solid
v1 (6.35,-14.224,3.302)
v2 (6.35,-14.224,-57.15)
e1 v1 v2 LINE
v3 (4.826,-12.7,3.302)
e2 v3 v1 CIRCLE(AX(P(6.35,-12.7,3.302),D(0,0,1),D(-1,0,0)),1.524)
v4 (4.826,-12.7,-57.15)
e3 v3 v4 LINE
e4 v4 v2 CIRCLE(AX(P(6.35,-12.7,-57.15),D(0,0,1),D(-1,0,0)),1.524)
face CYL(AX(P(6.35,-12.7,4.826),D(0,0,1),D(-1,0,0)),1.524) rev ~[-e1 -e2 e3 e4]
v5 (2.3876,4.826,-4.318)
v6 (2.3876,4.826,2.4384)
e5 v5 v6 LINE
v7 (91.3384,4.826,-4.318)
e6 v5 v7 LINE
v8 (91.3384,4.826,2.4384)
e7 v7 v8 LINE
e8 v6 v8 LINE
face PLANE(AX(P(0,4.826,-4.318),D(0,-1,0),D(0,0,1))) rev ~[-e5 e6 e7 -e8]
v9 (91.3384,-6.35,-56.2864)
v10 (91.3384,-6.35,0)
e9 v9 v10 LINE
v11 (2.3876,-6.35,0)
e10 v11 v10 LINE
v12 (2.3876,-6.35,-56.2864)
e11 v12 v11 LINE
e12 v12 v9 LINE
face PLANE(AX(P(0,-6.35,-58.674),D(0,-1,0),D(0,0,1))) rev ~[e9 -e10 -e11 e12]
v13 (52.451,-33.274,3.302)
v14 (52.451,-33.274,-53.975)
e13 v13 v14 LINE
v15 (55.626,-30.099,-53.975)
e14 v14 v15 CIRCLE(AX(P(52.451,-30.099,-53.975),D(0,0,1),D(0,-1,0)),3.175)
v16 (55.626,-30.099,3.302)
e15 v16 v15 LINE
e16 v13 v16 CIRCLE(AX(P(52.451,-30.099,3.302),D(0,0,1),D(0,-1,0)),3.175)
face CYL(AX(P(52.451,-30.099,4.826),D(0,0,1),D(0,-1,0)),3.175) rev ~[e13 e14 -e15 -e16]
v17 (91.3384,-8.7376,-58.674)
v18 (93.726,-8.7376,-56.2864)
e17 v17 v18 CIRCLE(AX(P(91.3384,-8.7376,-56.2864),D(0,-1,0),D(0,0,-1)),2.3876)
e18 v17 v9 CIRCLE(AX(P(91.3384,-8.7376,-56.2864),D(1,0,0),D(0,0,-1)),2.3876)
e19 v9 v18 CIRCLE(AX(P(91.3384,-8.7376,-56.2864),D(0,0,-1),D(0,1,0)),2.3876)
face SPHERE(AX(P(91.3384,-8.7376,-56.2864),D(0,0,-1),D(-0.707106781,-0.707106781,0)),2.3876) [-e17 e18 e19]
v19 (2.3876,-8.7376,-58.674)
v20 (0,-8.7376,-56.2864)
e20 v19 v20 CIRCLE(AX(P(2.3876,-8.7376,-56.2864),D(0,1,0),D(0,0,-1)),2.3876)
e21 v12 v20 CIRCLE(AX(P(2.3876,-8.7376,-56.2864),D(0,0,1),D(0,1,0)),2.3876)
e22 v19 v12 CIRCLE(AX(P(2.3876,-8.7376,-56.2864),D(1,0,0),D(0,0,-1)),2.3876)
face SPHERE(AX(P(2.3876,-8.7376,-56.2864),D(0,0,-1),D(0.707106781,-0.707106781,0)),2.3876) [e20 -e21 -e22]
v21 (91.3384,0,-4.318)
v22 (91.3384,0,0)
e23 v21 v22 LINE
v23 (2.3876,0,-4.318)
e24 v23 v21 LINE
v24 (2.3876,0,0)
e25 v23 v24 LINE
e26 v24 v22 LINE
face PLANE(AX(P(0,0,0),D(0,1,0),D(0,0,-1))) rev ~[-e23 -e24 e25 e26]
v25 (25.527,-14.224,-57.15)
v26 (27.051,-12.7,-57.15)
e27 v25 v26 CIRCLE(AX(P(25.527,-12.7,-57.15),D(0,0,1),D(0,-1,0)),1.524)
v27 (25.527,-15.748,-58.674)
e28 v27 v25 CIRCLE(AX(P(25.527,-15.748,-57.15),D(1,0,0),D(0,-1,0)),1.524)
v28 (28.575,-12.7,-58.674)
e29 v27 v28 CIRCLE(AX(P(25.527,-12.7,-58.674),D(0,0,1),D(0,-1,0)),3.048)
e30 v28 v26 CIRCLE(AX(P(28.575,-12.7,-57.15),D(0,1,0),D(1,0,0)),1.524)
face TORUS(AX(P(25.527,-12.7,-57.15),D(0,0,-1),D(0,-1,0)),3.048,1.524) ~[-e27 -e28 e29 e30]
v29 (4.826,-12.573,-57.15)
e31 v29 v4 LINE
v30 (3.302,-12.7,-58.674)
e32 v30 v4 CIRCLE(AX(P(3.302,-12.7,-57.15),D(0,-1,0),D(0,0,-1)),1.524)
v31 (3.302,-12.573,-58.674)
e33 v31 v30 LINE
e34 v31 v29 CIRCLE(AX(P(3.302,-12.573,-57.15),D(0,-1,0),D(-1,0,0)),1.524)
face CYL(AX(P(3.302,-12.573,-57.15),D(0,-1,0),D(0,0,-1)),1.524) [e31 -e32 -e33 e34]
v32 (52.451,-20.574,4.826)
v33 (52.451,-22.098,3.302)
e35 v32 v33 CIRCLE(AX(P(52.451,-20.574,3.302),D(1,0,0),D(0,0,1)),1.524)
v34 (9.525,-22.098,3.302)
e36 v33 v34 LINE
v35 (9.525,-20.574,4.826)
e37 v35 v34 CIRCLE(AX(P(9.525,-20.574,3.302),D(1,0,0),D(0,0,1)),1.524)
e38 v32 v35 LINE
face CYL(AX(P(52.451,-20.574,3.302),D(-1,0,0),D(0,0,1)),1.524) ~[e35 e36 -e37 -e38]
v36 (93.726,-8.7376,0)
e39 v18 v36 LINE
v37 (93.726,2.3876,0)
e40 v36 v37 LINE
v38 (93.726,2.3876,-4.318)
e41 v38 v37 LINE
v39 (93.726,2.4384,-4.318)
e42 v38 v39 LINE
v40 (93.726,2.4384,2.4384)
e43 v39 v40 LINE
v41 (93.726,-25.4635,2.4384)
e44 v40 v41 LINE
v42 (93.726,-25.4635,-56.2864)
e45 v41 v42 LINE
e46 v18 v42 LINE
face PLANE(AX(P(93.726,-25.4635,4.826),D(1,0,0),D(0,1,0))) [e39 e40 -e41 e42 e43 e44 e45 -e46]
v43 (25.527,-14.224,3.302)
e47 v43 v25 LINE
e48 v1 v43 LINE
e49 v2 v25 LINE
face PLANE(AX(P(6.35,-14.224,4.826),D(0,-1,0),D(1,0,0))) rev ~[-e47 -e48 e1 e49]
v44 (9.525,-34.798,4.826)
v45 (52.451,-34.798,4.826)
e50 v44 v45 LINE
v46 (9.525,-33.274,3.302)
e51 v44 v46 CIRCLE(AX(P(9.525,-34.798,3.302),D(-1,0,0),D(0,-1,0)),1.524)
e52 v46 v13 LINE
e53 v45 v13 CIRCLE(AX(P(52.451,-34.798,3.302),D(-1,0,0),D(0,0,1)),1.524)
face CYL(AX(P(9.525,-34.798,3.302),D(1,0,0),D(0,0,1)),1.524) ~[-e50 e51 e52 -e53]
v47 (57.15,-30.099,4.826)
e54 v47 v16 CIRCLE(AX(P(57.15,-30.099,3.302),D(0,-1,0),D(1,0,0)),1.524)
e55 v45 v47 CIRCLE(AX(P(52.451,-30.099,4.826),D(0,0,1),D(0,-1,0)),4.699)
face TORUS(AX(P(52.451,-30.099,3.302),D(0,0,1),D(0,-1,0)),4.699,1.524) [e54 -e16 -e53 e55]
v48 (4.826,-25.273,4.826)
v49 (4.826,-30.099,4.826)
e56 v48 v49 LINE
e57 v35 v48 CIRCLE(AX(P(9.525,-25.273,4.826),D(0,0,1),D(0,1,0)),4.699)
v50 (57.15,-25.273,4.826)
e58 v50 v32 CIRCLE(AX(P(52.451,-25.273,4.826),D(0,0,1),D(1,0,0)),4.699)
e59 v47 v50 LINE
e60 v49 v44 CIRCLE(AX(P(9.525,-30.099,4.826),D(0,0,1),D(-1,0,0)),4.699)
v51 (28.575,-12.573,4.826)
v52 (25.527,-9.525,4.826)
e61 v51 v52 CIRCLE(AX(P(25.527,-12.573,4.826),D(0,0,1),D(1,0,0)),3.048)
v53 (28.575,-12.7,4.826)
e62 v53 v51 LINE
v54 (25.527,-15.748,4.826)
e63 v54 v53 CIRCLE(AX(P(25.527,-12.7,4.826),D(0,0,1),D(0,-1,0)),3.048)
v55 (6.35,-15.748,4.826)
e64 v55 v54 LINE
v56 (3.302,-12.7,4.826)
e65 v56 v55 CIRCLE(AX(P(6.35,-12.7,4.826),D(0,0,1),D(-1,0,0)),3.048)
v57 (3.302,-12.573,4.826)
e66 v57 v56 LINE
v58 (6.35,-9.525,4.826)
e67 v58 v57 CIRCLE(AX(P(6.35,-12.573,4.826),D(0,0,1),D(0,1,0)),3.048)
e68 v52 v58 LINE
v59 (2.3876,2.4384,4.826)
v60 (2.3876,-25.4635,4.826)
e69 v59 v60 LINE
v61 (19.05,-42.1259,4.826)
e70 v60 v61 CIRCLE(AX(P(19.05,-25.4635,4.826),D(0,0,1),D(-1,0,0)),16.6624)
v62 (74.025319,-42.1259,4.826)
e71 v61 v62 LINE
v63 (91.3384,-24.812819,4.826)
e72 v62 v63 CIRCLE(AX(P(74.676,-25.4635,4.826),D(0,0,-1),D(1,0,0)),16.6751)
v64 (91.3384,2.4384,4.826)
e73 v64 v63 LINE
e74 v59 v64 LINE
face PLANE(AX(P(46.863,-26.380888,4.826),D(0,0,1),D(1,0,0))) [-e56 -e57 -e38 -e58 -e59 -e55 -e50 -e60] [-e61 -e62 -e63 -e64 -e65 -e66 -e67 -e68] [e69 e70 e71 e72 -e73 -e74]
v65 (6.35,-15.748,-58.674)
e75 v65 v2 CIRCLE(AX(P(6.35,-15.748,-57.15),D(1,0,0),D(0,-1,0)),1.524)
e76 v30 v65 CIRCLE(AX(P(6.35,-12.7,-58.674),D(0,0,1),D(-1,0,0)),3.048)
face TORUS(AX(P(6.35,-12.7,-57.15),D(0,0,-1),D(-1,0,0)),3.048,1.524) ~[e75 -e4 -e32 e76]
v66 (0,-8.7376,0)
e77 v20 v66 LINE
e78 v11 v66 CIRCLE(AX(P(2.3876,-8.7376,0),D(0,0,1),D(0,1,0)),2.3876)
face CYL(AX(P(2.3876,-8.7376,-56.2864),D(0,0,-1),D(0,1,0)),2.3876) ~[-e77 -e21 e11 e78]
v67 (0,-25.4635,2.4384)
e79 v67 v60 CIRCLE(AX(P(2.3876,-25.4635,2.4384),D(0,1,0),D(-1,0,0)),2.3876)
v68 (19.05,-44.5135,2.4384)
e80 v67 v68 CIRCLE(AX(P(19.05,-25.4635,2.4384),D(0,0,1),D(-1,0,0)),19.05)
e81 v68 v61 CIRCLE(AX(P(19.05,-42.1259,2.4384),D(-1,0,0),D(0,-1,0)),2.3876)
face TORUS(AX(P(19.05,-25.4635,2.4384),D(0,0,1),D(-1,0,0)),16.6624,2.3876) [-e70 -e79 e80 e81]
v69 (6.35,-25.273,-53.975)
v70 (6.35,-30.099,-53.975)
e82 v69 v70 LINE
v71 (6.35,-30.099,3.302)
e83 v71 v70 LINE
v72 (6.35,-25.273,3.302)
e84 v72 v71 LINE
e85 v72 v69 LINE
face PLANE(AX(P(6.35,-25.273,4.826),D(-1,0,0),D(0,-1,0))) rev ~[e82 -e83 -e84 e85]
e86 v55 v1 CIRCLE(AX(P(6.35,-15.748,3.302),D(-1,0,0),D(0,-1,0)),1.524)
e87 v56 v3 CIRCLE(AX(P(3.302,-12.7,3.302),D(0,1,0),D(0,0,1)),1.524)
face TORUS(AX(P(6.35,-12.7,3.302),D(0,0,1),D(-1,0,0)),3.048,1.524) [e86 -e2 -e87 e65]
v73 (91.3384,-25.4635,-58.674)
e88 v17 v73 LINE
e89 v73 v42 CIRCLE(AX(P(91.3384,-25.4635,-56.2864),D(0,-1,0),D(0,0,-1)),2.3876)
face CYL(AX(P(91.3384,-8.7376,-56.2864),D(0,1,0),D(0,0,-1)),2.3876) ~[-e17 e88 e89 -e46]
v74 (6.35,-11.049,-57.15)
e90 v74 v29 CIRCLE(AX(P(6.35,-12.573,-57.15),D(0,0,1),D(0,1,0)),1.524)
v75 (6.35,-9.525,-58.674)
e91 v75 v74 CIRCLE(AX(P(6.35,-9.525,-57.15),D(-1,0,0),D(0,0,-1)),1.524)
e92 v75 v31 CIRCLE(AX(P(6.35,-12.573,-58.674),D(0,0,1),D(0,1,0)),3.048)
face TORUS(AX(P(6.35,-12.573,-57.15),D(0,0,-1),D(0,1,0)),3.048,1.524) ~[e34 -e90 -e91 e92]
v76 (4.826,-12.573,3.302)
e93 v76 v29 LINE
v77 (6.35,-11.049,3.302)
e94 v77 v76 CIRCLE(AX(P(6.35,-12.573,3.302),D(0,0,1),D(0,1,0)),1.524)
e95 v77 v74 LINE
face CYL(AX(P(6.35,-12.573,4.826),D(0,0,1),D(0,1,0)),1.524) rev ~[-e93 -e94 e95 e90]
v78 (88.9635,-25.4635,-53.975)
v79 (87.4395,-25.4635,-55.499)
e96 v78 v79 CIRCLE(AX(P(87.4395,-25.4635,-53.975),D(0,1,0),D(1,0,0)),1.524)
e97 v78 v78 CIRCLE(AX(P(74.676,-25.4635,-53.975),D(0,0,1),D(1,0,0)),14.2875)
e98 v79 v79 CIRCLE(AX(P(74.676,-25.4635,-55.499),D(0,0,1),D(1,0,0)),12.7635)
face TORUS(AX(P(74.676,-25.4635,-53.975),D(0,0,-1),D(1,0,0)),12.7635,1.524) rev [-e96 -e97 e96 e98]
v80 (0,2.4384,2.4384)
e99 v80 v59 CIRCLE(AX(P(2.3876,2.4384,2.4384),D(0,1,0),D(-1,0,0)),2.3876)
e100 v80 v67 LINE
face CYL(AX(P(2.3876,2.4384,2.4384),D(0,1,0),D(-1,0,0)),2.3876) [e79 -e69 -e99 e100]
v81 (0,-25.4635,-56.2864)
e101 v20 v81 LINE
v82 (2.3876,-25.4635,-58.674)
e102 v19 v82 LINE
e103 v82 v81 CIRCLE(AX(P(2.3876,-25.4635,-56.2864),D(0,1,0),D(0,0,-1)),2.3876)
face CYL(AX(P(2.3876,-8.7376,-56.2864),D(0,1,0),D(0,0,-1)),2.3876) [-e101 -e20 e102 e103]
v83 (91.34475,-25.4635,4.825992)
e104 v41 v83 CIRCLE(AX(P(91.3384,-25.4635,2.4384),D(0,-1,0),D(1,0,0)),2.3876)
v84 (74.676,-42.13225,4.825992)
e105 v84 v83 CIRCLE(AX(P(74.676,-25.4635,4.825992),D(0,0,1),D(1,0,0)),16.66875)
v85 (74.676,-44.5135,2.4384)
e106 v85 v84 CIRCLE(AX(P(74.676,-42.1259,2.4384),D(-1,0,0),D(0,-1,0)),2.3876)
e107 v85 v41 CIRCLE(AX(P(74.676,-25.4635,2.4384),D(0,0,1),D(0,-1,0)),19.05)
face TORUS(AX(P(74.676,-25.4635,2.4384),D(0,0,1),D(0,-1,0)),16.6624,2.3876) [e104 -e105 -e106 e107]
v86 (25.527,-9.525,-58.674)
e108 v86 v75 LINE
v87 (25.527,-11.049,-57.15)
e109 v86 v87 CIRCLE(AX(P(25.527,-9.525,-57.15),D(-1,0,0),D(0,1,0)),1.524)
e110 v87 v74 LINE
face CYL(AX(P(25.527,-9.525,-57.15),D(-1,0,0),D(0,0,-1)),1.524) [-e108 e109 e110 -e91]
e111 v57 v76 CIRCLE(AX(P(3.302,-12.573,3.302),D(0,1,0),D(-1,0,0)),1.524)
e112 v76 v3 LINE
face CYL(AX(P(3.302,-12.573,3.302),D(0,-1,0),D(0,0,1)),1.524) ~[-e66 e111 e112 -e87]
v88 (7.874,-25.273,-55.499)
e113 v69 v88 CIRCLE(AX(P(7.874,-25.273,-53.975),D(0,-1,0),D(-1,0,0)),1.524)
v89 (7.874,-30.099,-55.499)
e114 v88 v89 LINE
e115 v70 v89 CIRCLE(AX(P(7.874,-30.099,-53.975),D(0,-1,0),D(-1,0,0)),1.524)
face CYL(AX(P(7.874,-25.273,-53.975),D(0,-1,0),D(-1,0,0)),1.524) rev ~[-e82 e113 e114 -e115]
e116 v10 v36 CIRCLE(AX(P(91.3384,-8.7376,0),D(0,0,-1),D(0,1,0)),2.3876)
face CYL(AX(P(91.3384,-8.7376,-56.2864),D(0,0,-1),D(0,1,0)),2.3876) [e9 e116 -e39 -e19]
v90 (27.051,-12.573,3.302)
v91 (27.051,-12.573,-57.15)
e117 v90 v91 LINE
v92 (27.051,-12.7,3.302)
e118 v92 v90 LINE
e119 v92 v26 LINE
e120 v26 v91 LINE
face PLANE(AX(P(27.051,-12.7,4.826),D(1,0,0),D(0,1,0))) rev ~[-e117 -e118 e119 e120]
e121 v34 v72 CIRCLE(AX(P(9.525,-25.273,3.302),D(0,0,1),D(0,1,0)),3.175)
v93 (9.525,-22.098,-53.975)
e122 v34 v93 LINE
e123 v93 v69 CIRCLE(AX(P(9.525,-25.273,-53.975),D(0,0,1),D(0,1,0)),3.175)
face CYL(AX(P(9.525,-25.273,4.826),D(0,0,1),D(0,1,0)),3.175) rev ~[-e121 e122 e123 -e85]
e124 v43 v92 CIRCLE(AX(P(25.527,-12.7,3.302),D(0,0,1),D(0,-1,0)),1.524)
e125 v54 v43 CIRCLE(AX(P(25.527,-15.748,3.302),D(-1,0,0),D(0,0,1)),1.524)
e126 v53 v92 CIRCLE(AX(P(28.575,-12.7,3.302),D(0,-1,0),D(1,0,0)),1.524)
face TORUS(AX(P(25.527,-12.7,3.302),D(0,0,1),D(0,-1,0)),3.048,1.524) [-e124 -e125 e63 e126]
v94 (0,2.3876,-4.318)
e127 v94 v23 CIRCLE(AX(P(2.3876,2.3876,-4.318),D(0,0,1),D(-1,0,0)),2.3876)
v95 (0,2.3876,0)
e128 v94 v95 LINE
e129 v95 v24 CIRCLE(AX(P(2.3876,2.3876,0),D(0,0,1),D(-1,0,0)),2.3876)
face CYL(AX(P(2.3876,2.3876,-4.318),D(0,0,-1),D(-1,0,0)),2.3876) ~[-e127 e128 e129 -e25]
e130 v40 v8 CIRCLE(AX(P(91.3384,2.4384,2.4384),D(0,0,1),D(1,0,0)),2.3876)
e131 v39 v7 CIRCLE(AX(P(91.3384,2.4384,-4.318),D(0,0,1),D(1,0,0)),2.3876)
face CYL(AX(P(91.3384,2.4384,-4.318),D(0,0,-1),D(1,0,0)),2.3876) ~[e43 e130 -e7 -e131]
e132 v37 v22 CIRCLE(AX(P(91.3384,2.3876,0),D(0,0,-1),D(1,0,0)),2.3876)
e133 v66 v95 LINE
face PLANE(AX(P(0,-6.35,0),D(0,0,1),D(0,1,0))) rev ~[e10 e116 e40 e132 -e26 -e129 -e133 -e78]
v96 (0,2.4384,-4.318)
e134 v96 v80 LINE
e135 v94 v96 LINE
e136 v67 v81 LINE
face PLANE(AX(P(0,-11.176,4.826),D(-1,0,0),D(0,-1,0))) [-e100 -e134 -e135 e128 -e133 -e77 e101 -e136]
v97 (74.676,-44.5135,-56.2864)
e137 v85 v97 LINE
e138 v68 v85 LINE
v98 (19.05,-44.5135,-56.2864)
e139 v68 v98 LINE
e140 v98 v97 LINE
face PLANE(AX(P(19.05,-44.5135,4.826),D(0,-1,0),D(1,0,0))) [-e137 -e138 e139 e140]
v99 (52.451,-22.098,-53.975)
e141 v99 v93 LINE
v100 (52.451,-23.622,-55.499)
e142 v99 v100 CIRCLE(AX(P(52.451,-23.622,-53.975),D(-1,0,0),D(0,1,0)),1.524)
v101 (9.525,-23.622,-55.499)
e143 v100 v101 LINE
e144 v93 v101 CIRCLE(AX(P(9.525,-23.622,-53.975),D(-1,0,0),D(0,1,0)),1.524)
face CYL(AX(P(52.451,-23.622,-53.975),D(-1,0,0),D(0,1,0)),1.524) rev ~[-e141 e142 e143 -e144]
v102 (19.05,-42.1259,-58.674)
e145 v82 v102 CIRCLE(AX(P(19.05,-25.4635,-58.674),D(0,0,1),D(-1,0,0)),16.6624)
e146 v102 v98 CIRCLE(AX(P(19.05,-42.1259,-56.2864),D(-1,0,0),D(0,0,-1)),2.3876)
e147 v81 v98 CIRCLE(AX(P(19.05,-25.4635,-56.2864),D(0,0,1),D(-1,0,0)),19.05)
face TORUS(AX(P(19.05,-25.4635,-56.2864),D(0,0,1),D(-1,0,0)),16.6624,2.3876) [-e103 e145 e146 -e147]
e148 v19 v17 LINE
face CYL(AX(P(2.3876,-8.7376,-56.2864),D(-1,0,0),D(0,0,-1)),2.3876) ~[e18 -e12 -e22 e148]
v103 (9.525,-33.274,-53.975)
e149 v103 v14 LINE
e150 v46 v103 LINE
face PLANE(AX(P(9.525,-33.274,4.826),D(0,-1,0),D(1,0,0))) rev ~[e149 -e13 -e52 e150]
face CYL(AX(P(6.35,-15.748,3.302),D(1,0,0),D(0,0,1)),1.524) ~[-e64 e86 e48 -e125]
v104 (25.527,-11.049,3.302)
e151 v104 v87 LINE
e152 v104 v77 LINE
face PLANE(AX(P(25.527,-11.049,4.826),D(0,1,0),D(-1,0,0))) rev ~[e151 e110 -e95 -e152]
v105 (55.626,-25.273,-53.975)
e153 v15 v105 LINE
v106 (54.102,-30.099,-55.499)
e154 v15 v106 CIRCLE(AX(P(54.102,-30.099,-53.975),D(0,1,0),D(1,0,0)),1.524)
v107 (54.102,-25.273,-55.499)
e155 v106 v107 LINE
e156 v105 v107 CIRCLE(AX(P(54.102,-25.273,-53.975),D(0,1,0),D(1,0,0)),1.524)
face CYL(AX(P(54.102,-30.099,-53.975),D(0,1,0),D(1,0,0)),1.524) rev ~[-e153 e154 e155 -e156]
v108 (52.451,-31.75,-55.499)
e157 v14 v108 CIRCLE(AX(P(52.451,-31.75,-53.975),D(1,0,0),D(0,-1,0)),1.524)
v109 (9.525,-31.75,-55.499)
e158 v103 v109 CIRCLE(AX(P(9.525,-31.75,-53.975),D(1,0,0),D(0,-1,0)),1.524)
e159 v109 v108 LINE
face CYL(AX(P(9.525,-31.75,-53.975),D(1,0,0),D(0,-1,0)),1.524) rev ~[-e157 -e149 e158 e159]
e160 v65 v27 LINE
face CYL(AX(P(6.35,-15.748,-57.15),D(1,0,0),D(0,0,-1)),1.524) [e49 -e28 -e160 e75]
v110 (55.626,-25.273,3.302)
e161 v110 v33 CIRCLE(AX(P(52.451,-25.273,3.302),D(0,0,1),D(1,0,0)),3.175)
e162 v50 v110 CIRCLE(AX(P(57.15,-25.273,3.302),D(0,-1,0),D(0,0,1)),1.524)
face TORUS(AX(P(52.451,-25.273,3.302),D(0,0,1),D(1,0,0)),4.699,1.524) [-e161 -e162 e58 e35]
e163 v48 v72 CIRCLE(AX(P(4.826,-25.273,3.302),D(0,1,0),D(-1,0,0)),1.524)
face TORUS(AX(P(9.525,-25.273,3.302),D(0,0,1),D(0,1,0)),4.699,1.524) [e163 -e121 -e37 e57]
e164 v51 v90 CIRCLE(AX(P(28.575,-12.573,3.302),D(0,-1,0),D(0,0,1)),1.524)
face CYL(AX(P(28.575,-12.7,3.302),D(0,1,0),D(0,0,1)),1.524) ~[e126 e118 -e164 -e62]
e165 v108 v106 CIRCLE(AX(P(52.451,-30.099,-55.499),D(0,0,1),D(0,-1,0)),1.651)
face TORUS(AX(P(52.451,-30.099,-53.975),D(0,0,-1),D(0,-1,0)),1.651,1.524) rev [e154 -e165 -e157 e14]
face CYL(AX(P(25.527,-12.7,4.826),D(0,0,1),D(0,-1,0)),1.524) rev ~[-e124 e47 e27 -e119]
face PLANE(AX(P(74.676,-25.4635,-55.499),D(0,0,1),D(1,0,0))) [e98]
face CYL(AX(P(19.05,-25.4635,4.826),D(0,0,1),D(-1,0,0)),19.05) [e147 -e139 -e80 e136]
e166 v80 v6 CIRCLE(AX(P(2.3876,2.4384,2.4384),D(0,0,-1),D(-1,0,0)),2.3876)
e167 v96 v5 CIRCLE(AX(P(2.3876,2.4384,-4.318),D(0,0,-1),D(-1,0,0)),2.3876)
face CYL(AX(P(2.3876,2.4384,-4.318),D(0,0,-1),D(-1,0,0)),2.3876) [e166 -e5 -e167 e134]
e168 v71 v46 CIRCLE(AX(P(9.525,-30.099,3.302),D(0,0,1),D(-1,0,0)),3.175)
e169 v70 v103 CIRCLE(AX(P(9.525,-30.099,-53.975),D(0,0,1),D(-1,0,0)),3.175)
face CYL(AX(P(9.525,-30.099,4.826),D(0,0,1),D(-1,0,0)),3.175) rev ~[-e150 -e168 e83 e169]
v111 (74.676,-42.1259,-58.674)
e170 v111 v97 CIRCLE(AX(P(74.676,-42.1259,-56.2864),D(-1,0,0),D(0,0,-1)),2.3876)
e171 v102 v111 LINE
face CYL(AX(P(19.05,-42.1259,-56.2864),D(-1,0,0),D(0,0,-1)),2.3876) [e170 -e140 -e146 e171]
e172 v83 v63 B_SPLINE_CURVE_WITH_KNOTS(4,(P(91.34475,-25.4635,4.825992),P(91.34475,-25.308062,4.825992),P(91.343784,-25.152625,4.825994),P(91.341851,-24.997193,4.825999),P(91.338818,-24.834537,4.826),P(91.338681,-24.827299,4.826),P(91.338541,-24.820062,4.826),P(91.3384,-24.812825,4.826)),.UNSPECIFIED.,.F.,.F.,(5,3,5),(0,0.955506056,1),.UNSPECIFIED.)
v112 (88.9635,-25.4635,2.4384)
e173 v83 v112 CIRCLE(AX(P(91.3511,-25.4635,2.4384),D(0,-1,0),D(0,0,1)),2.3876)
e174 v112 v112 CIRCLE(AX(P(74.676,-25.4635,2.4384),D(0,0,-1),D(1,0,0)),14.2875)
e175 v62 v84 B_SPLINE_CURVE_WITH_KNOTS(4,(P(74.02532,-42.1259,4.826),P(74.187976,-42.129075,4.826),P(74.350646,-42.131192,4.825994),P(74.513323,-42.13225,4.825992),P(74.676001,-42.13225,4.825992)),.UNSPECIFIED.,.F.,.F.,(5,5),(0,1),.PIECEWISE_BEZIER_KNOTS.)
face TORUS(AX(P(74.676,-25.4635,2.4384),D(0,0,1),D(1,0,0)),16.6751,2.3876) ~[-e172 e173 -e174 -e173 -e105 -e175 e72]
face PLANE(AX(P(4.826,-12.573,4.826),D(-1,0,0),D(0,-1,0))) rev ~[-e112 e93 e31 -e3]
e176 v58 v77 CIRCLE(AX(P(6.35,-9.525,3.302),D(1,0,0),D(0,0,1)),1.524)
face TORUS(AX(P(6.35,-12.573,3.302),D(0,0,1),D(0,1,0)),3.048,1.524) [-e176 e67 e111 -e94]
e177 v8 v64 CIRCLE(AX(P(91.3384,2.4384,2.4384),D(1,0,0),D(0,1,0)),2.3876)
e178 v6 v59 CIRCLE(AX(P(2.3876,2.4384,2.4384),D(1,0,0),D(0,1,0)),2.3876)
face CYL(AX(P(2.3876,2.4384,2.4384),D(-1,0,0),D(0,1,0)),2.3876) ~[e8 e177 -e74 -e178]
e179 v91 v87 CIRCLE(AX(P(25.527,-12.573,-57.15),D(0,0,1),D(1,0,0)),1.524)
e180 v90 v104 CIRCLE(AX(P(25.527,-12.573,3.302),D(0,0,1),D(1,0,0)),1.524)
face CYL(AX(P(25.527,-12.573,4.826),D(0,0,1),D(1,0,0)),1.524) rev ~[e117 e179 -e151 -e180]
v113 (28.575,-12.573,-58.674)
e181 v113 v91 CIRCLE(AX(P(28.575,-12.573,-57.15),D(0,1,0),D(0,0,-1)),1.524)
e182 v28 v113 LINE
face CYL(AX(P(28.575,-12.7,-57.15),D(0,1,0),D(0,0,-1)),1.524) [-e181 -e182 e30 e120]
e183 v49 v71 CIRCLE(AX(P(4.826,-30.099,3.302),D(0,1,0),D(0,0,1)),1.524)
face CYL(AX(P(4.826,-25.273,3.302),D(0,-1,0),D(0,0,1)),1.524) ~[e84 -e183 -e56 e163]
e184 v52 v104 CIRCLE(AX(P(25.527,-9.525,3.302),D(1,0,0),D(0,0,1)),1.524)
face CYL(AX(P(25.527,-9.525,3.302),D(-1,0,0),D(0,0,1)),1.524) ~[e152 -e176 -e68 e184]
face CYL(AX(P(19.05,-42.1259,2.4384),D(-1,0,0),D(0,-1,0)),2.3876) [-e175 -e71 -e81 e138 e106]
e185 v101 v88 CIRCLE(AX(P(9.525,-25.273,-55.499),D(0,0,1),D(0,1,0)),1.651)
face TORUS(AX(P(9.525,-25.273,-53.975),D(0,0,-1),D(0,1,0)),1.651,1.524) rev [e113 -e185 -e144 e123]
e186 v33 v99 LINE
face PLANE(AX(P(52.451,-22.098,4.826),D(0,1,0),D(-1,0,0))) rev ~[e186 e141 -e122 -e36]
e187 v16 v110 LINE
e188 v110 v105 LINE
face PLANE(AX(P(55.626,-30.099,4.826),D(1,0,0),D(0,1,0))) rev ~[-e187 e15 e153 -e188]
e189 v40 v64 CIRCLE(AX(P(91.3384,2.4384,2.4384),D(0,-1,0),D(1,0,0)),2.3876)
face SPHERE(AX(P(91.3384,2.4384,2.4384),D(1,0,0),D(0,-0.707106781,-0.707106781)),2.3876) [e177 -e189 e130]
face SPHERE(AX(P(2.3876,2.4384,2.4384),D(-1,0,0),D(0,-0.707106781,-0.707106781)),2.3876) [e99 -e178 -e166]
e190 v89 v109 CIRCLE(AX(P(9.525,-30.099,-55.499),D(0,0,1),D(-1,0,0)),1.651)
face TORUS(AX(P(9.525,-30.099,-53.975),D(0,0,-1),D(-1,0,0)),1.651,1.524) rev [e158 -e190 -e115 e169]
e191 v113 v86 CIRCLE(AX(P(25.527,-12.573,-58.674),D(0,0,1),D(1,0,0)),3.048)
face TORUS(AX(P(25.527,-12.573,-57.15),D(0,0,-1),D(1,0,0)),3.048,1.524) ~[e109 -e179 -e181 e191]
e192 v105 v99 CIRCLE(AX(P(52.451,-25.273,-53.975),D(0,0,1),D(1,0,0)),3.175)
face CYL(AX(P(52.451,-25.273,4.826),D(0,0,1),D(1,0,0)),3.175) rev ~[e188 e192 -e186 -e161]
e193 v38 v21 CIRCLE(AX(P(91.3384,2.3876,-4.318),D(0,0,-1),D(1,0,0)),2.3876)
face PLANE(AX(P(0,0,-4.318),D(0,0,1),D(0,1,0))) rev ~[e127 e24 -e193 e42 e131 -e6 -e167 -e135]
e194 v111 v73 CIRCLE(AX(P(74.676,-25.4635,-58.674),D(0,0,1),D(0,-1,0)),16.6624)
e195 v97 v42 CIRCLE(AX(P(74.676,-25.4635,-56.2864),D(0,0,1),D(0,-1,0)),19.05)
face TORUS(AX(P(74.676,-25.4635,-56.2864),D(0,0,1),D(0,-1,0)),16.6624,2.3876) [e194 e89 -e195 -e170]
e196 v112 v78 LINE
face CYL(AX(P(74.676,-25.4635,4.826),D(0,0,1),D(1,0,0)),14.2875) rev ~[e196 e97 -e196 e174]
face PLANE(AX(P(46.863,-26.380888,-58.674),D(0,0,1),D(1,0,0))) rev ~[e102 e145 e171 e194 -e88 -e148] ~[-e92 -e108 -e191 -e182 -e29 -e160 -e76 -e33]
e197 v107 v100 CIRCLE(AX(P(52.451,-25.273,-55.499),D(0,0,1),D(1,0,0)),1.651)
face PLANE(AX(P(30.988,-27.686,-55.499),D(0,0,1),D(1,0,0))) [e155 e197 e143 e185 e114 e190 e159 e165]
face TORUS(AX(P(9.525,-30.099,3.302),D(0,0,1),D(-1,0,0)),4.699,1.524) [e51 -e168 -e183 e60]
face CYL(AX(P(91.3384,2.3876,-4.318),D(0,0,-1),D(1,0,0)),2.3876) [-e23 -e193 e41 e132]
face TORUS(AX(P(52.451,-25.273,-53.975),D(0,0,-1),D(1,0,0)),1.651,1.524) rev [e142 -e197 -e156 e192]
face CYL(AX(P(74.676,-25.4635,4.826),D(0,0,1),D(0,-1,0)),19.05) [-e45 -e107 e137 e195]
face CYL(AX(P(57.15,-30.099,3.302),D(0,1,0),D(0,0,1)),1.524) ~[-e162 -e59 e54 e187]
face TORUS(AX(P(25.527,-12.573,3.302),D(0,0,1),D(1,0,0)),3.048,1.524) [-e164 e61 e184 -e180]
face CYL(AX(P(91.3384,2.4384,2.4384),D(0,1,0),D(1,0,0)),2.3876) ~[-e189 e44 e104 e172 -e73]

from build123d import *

# Parameters (mm, degrees)
F1_DEPTH     = 93.726
F3_DEPTH     = 63.5
F4_DEPTH     = 60.325
F6_DEPTH     = 63.501
F8_DEPTH     = 60.325
F9_T1_DEPTH  = 88.9508
F9_T3_DEPTH  = 27.9019
F9_T5_DEPTH  = 6.7564
F9_T7_DEPTH  = 56.2864
F9_T9_DEPTH  = 16.7259
F9_T11_DEPTH = 4.318
F9_T13_DEPTH = 55.626
F9_S17_W     = 2.435352
F9_S17_H     = 2.435352
F9_T18_DEPTH = 2.435352
F9_S23_W     = 2.435352
F9_S23_H     = 2.435352
F9_T24_DEPTH = 2.435352
F9_S29_W     = 2.435352
F9_S29_H     = 2.435352
F9_T30_DEPTH = 2.435352
F9_S35_W     = 2.435352
F9_S35_H     = 2.435352
F9_T36_DEPTH = 2.435352
F9_T42_ANGLE = 90
F9_T44_ANGLE = 90
F9_T46_ANGLE = 90
F9_T48_ANGLE = 90
F10_R        = 1.524


# Not quite as in the source:
# - a fillet or chamfer that OpenCascade refuses, or shapes differently, is made with other operations: its cross-section is extruded or revolved along the edge and cut away or added


with BuildPart() as f1:
    # F0 (on Right) → F1 (new body)
    with BuildSketch(Plane.YZ):
        Polygon((-6.35, 0), (0, 0), (0, -4.318), (4.826, -4.318), (4.826, 4.826), (-11.176, 4.826), (-11.176, -58.674), (-6.35, -58.674), align=None)
    extrude(amount=F1_DEPTH)

    # F2 (on face) → F3 (join, through all)
    with BuildSketch(Plane.XY.offset(4.826)):
        with BuildLine():
            Line((93.726, -11.176), (74.676, -11.176))
            Line((74.676, -11.176), (0, -11.176))
            Line((0, -11.176), (0, -25.4635))
            ThreePointArc((0, -25.4635), (5.5796158184, -38.9338841816), (19.05, -44.5135))
            Line((19.05, -44.5135), (74.676, -44.5135))
            ThreePointArc((74.676, -44.5135), (88.1463841816, -38.9338841816), (93.726, -25.4635))
            Line((93.726, -25.4635), (93.726, -11.176))
        make_face()
        with BuildLine():
            ThreePointArc((74.676, -11.176), (84.7787881362, -15.3607118638), (88.9635, -25.4635))
            ThreePointArc((88.9635, -25.4635), (64.5732118638, -35.5662881362), (74.676, -11.176))
        make_face(mode=Mode.SUBTRACT)
        with BuildLine():
            ThreePointArc((74.676, -11.176), (64.5732118638, -35.5662881362), (88.9635, -25.4635))
            ThreePointArc((88.9635, -25.4635), (84.7787881362, -15.3607118638), (74.676, -11.176))
        make_face()
    extrude(amount=-F3_DEPTH)

    # F2 (on face) → F4 (cut)
    with BuildSketch(Plane.XY.offset(4.826)):
        with BuildLine():
            ThreePointArc((74.676, -11.176), (64.5732118638, -35.5662881362), (88.9635, -25.4635))
            ThreePointArc((88.9635, -25.4635), (84.7787881362, -15.3607118638), (74.676, -11.176))
        make_face()
    extrude(amount=-F4_DEPTH, mode=Mode.SUBTRACT)

    # F5 (on face) → F6 (cut, through all)
    with BuildSketch(Plane.XY.offset(4.826)):
        with BuildLine():
            Line((25.527, -11.049), (6.35, -11.049))
            ThreePointArc((6.35, -11.049), (5.2723692655, -11.4953692655), (4.826, -12.573))
            Line((4.826, -12.573), (4.826, -12.7))
            ThreePointArc((4.826, -12.7), (5.2723692655, -13.7776307345), (6.35, -14.224))
            Line((6.35, -14.224), (25.527, -14.224))
            ThreePointArc((25.527, -14.224), (26.6046307345, -13.7776307345), (27.051, -12.7))
            Line((27.051, -12.7), (27.051, -12.573))
            ThreePointArc((27.051, -12.573), (26.6046307345, -11.4953692655), (25.527, -11.049))
        make_face()
    extrude(amount=-F6_DEPTH, mode=Mode.SUBTRACT)

    # F7 (on face) → F8 (cut, through all)
    with BuildSketch(Plane.XY.offset(4.826)):
        with BuildLine():
            ThreePointArc((55.626, -25.273), (54.6960640303, -23.0279359697), (52.451, -22.098))
            Line((52.451, -22.098), (9.525, -22.098))
            ThreePointArc((9.525, -22.098), (7.2799359697, -23.0279359697), (6.35, -25.273))
            Line((6.35, -25.273), (6.35, -30.099))
            ThreePointArc((6.35, -30.099), (7.2799359697, -32.3440640303), (9.525, -33.274))
            Line((9.525, -33.274), (52.451, -33.274))
            ThreePointArc((52.451, -33.274), (54.6960640303, -32.3440640303), (55.626, -30.099))
            Line((55.626, -30.099), (55.626, -25.273))
        make_face()
    extrude(amount=-F8_DEPTH, mode=Mode.SUBTRACT)

    # F9: fillet of radius 2.3876 on 11 edges, made by hand

    # F9_s2 → F9_t1 (cut)
    with BuildSketch(Plane.YZ.offset(2.3876)):
        with BuildLine():
            ThreePointArc((4.826, 2.4384), (4.1266881508, 4.1266881508), (2.4384, 4.826))
            Line((2.4384, 4.826), (2.4384, 4.873752))
            Line((2.4384, 4.873752), (4.873752, 4.873752))
            Line((4.873752, 4.873752), (4.873752, 2.4384))
            Line((4.873752, 2.4384), (4.826, 2.4384))
        make_face()
        with BuildLine():
            ThreePointArc((-8.7376, -58.674), (-7.0493118492, -57.9746881508), (-6.35, -56.2864))
            Line((-6.35, -56.2864), (-6.302248, -56.2864))
            Line((-6.302248, -56.2864), (-6.302248, -58.721752))
            Line((-6.302248, -58.721752), (-8.7376, -58.721752))
            Line((-8.7376, -58.721752), (-8.7376, -58.674))
        make_face()
    extrude(amount=F9_T1_DEPTH, mode=Mode.SUBTRACT)

    # F9_s4 → F9_t3 (cut)
    with BuildSketch(Plane.XZ.offset(-2.4384)):
        with BuildLine():
            ThreePointArc((0, 2.4384), (0.6993118492, 4.1266881508), (2.3876, 4.826))
            Line((2.3876, 4.826), (2.3876, 4.873752))
            Line((2.3876, 4.873752), (-0.047752, 4.873752))
            Line((-0.047752, 4.873752), (-0.047752, 2.4384))
            Line((-0.047752, 2.4384), (0, 2.4384))
        make_face()
        with BuildLine():
            ThreePointArc((93.726, 2.4384), (93.0266881508, 4.1266881508), (91.3384, 4.826))
            Line((91.3384, 4.826), (91.3384, 4.873752))
            Line((91.3384, 4.873752), (93.773752, 4.873752))
            Line((93.773752, 4.873752), (93.773752, 2.4384))
            Line((93.773752, 2.4384), (93.726, 2.4384))
        make_face()
    extrude(amount=F9_T3_DEPTH, mode=Mode.SUBTRACT)

    # F9_s6 → F9_t5 (cut)
    with BuildSketch(Plane.XY.offset(-4.318)):
        with BuildLine():
            ThreePointArc((0, 2.4384), (0.6993118492, 4.1266881508), (2.3876, 4.826))
            Line((2.3876, 4.826), (2.3876, 4.873752))
            Line((2.3876, 4.873752), (-0.047752, 4.873752))
            Line((-0.047752, 4.873752), (-0.047752, 2.4384))
            Line((-0.047752, 2.4384), (0, 2.4384))
        make_face()
        with BuildLine():
            ThreePointArc((93.726, 2.4384), (93.0266881508, 4.1266881508), (91.3384, 4.826))
            Line((91.3384, 4.826), (91.3384, 4.873752))
            Line((91.3384, 4.873752), (93.773752, 4.873752))
            Line((93.773752, 4.873752), (93.773752, 2.4384))
            Line((93.773752, 2.4384), (93.726, 2.4384))
        make_face()
    extrude(amount=F9_T5_DEPTH, mode=Mode.SUBTRACT)

    # F9_s8 → F9_t7 (cut)
    with BuildSketch(Plane.XY.offset(-56.2864)):
        with BuildLine():
            ThreePointArc((2.3876, -6.35), (0.6993118492, -7.0493118492), (0, -8.7376))
            Line((0, -8.7376), (-0.047752, -8.7376))
            Line((-0.047752, -8.7376), (-0.047752, -6.302248))
            Line((-0.047752, -6.302248), (2.3876, -6.302248))
            Line((2.3876, -6.302248), (2.3876, -6.35))
        make_face()
        with BuildLine():
            ThreePointArc((91.3384, -6.35), (93.0266881508, -7.0493118492), (93.726, -8.7376))
            Line((93.726, -8.7376), (93.773752, -8.7376))
            Line((93.773752, -8.7376), (93.773752, -6.302248))
            Line((93.773752, -6.302248), (91.3384, -6.302248))
            Line((91.3384, -6.302248), (91.3384, -6.35))
        make_face()
    extrude(amount=F9_T7_DEPTH, mode=Mode.SUBTRACT)

    # F9_s10 → F9_t9 (cut)
    with BuildSketch(Plane.XZ.offset(8.7376)):
        with BuildLine():
            ThreePointArc((2.3876, -58.674), (0.6993118492, -57.9746881508), (0, -56.2864))
            Line((0, -56.2864), (-0.047752, -56.2864))
            Line((-0.047752, -56.2864), (-0.047752, -58.721752))
            Line((-0.047752, -58.721752), (2.3876, -58.721752))
            Line((2.3876, -58.721752), (2.3876, -58.674))
        make_face()
        with BuildLine():
            ThreePointArc((91.3384, -58.674), (93.0266881508, -57.9746881508), (93.726, -56.2864))
            Line((93.726, -56.2864), (93.773752, -56.2864))
            Line((93.773752, -56.2864), (93.773752, -58.721752))
            Line((93.773752, -58.721752), (91.3384, -58.721752))
            Line((91.3384, -58.721752), (91.3384, -58.674))
        make_face()
    extrude(amount=F9_T9_DEPTH, mode=Mode.SUBTRACT)

    # F9_s12 → F9_t11 (cut)
    with BuildSketch(Plane.XY.offset(-4.318)):
        with BuildLine():
            ThreePointArc((0, 2.3876), (0.6993118492, 0.6993118492), (2.3876, 0))
            Line((2.3876, 0), (2.3876, -0.047752))
            Line((2.3876, -0.047752), (-0.047752, -0.047752))
            Line((-0.047752, -0.047752), (-0.047752, 2.3876))
            Line((-0.047752, 2.3876), (0, 2.3876))
        make_face()
        with BuildLine():
            ThreePointArc((93.726, 2.3876), (93.0266881508, 0.6993118492), (91.3384, 0))
            Line((91.3384, 0), (91.3384, -0.047752))
            Line((91.3384, -0.047752), (93.773752, -0.047752))
            Line((93.773752, -0.047752), (93.773752, 2.3876))
            Line((93.773752, 2.3876), (93.726, 2.3876))
        make_face()
    extrude(amount=F9_T11_DEPTH, mode=Mode.SUBTRACT)

    # F9_s14 → F9_t13 (cut)
    with BuildSketch(Plane.YZ.offset(19.05)):
        with BuildLine():
            ThreePointArc((-42.1259, -58.674), (-43.8141881508, -57.9746881508), (-44.5135, -56.2864))
            Line((-44.5135, -56.2864), (-44.561252, -56.2864))
            Line((-44.561252, -56.2864), (-44.561252, -58.721752))
            Line((-44.561252, -58.721752), (-42.1259, -58.721752))
            Line((-42.1259, -58.721752), (-42.1259, -58.674))
        make_face()
        with BuildLine():
            ThreePointArc((-44.5135, 2.4384), (-43.8141881508, 4.1266881508), (-42.1259, 4.826))
            Line((-42.1259, 4.826), (-42.1259, 4.873752))
            Line((-42.1259, 4.873752), (-44.561252, 4.873752))
            Line((-44.561252, 4.873752), (-44.561252, 2.4384))
            Line((-44.561252, 2.4384), (-44.5135, 2.4384))
        make_face()
    extrude(amount=F9_T13_DEPTH, mode=Mode.SUBTRACT)


with BuildPart() as f9_tool16:
    # F9_s17 → F9_t18 (new body)
    with BuildSketch(Plane.YZ.offset(2.3876)):
        with Locations((3.656076, 3.656076)):
            Rectangle(F9_S17_W, F9_S17_H)
    extrude(amount=-F9_T18_DEPTH)

    # F9_s19 → F9_t20 (revolve, cut)
    with BuildSketch(Plane(origin=(2.3876, 2.4384, 2.4384), x_dir=(0, -0.7071067812, -0.7071067812), z_dir=(0, 0.7071067812, -0.7071067812))):
        with BuildLine():
            ThreePointArc((0, -2.3876), (2.3876, 0), (0, 2.3876))
            Line((0, 2.3876), (0, -2.3876))
        make_face()
    revolve(axis=Axis((2.3876, 2.4384, 2.4384), (-1, 0, 0)), mode=Mode.SUBTRACT)


with BuildPart() as f1_1:
    add(f1.part)

    # F9_t15: cut F9_tool16
    add(f9_tool16.part, mode=Mode.SUBTRACT)


with BuildPart() as f9_tool22:
    # F9_s23 → F9_t24 (new body)
    with BuildSketch(Plane.YZ.offset(91.3384)):
        with Locations((3.656076, 3.656076)):
            Rectangle(F9_S23_W, F9_S23_H)
    extrude(amount=F9_T24_DEPTH)

    # F9_s25 → F9_t26 (revolve, cut)
    with BuildSketch(Plane(origin=(91.3384, 2.4384, 2.4384), x_dir=(0, -0.7071067812, -0.7071067812), z_dir=(0, -0.7071067812, 0.7071067812))):
        with BuildLine():
            ThreePointArc((0, -2.3876), (2.3876, 0), (0, 2.3876))
            Line((0, 2.3876), (0, -2.3876))
        make_face()
    revolve(axis=Axis((91.3384, 2.4384, 2.4384), (1, 0, 0)), mode=Mode.SUBTRACT)


with BuildPart() as f1_2:
    add(f1_1.part)

    # F9_t21: cut F9_tool22
    add(f9_tool22.part, mode=Mode.SUBTRACT)


with BuildPart() as f9_tool28:
    # F9_s29 → F9_t30 (new body)
    with BuildSketch(Plane.XY.offset(-56.2864)):
        with Locations((1.169924, -7.519924)):
            Rectangle(F9_S29_W, F9_S29_H)
    extrude(amount=-F9_T30_DEPTH)

    # F9_s31 → F9_t32 (revolve, cut)
    with BuildSketch(Plane(origin=(2.3876, -8.7376, -56.2864), x_dir=(0.7071067812, -0.7071067812, 0), z_dir=(0.7071067812, 0.7071067812, 0))):
        with BuildLine():
            ThreePointArc((0, -2.3876), (2.3876, 0), (0, 2.3876))
            Line((0, 2.3876), (0, -2.3876))
        make_face()
    revolve(axis=Axis((2.3876, -8.7376, -56.2864), (0, 0, -1)), mode=Mode.SUBTRACT)


with BuildPart() as f1_3:
    add(f1_2.part)

    # F9_t27: cut F9_tool28
    add(f9_tool28.part, mode=Mode.SUBTRACT)


with BuildPart() as f9_tool34:
    # F9_s35 → F9_t36 (new body)
    with BuildSketch(Plane.XY.offset(-56.2864)):
        with Locations((92.556076, -7.519924)):
            Rectangle(F9_S35_W, F9_S35_H)
    extrude(amount=-F9_T36_DEPTH)

    # F9_s37 → F9_t38 (revolve, cut)
    with BuildSketch(Plane(origin=(91.3384, -8.7376, -56.2864), x_dir=(-0.7071067812, -0.7071067812, 0), z_dir=(0.7071067812, -0.7071067812, 0))):
        with BuildLine():
            ThreePointArc((0, -2.3876), (2.3876, 0), (0, 2.3876))
            Line((0, 2.3876), (0, -2.3876))
        make_face()
    revolve(axis=Axis((91.3384, -8.7376, -56.2864), (0, 0, -1)), mode=Mode.SUBTRACT)


with BuildPart() as f1_4:
    add(f1_3.part)

    # F9_t33: cut F9_tool34
    add(f9_tool34.part, mode=Mode.SUBTRACT)

    # F9_s39 → F9_t40 (revolve, cut)
    with BuildSketch(Plane.XZ.offset(25.4635)):
        with BuildLine():
            ThreePointArc((91.3511, 4.826), (89.6628118492, 4.1266881508), (88.9635, 2.4384))
            Line((88.9635, 2.4384), (88.915748, 2.4384))
            Line((88.915748, 2.4384), (88.915748, 4.873752))
            Line((88.915748, 4.873752), (91.3511, 4.873752))
            Line((91.3511, 4.873752), (91.3511, 4.826))
        make_face()
    revolve(axis=Axis((74.676, -25.4635, 4.826), (0, 0, -1)), mode=Mode.SUBTRACT)

    # F9_s41 → F9_t42 (revolve, cut)
    with BuildSketch(Plane.XZ.offset(25.4635)):
        with BuildLine():
            ThreePointArc((2.3876, -58.674), (0.6993118492, -57.9746881508), (0, -56.2864))
            Line((0, -56.2864), (-0.047752, -56.2864))
            Line((-0.047752, -56.2864), (-0.047752, -58.721752))
            Line((-0.047752, -58.721752), (2.3876, -58.721752))
            Line((2.3876, -58.721752), (2.3876, -58.674))
        make_face()
    revolve(axis=Axis((19.05, -25.4635, -58.674), (0, 0, 1)), revolution_arc=F9_T42_ANGLE, mode=Mode.SUBTRACT)

    # F9_s43 → F9_t44 (revolve, cut)
    with BuildSketch(Plane.YZ.offset(74.676)):
        with BuildLine():
            ThreePointArc((-42.1259, -58.674), (-43.8141881508, -57.9746881508), (-44.5135, -56.2864))
            Line((-44.5135, -56.2864), (-44.561252, -56.2864))
            Line((-44.561252, -56.2864), (-44.561252, -58.721752))
            Line((-44.561252, -58.721752), (-42.1259, -58.721752))
            Line((-42.1259, -58.721752), (-42.1259, -58.674))
        make_face()
    revolve(axis=Axis((74.676, -25.4635, -58.674), (0, 0, 1)), revolution_arc=F9_T44_ANGLE, mode=Mode.SUBTRACT)

    # F9_s45 → F9_t46 (revolve, cut)
    with BuildSketch(Plane.XZ.offset(25.4635)):
        with BuildLine():
            ThreePointArc((0, 2.4384), (0.6993118492, 4.1266881508), (2.3876, 4.826))
            Line((2.3876, 4.826), (2.3876, 4.873752))
            Line((2.3876, 4.873752), (-0.047752, 4.873752))
            Line((-0.047752, 4.873752), (-0.047752, 2.4384))
            Line((-0.047752, 2.4384), (0, 2.4384))
        make_face()
    revolve(axis=Axis((19.05, -25.4635, 4.826), (0, 0, 1)), revolution_arc=F9_T46_ANGLE, mode=Mode.SUBTRACT)

    # F9_s47 → F9_t48 (revolve, cut)
    with BuildSketch(Plane.YZ.offset(74.676)):
        with BuildLine():
            ThreePointArc((-44.5135, 2.4384), (-43.8141881508, 4.1266881508), (-42.1259, 4.826))
            Line((-42.1259, 4.826), (-42.1259, 4.873752))
            Line((-42.1259, 4.873752), (-44.561252, 4.873752))
            Line((-44.561252, 4.873752), (-44.561252, 2.4384))
            Line((-44.561252, 2.4384), (-44.5135, 2.4384))
        make_face()
    revolve(axis=Axis((74.676, -25.4635, 4.826), (0, 0, 1)), revolution_arc=F9_T48_ANGLE, mode=Mode.SUBTRACT)

    # F10
    f10_edges = [f1_4.edges().sort_by_distance(p)[0] for p in [
        (15.9385, -11.049, 4.826),
        (26.604631, -13.777631, -58.674),
        (30.988, -22.098, 4.826),
        (30.988, -33.274, -55.499),
        (60.3885, -25.4635, -55.499),
    ]]
    fillet(f10_edges, radius=F10_R)


solid = f1_4.part
